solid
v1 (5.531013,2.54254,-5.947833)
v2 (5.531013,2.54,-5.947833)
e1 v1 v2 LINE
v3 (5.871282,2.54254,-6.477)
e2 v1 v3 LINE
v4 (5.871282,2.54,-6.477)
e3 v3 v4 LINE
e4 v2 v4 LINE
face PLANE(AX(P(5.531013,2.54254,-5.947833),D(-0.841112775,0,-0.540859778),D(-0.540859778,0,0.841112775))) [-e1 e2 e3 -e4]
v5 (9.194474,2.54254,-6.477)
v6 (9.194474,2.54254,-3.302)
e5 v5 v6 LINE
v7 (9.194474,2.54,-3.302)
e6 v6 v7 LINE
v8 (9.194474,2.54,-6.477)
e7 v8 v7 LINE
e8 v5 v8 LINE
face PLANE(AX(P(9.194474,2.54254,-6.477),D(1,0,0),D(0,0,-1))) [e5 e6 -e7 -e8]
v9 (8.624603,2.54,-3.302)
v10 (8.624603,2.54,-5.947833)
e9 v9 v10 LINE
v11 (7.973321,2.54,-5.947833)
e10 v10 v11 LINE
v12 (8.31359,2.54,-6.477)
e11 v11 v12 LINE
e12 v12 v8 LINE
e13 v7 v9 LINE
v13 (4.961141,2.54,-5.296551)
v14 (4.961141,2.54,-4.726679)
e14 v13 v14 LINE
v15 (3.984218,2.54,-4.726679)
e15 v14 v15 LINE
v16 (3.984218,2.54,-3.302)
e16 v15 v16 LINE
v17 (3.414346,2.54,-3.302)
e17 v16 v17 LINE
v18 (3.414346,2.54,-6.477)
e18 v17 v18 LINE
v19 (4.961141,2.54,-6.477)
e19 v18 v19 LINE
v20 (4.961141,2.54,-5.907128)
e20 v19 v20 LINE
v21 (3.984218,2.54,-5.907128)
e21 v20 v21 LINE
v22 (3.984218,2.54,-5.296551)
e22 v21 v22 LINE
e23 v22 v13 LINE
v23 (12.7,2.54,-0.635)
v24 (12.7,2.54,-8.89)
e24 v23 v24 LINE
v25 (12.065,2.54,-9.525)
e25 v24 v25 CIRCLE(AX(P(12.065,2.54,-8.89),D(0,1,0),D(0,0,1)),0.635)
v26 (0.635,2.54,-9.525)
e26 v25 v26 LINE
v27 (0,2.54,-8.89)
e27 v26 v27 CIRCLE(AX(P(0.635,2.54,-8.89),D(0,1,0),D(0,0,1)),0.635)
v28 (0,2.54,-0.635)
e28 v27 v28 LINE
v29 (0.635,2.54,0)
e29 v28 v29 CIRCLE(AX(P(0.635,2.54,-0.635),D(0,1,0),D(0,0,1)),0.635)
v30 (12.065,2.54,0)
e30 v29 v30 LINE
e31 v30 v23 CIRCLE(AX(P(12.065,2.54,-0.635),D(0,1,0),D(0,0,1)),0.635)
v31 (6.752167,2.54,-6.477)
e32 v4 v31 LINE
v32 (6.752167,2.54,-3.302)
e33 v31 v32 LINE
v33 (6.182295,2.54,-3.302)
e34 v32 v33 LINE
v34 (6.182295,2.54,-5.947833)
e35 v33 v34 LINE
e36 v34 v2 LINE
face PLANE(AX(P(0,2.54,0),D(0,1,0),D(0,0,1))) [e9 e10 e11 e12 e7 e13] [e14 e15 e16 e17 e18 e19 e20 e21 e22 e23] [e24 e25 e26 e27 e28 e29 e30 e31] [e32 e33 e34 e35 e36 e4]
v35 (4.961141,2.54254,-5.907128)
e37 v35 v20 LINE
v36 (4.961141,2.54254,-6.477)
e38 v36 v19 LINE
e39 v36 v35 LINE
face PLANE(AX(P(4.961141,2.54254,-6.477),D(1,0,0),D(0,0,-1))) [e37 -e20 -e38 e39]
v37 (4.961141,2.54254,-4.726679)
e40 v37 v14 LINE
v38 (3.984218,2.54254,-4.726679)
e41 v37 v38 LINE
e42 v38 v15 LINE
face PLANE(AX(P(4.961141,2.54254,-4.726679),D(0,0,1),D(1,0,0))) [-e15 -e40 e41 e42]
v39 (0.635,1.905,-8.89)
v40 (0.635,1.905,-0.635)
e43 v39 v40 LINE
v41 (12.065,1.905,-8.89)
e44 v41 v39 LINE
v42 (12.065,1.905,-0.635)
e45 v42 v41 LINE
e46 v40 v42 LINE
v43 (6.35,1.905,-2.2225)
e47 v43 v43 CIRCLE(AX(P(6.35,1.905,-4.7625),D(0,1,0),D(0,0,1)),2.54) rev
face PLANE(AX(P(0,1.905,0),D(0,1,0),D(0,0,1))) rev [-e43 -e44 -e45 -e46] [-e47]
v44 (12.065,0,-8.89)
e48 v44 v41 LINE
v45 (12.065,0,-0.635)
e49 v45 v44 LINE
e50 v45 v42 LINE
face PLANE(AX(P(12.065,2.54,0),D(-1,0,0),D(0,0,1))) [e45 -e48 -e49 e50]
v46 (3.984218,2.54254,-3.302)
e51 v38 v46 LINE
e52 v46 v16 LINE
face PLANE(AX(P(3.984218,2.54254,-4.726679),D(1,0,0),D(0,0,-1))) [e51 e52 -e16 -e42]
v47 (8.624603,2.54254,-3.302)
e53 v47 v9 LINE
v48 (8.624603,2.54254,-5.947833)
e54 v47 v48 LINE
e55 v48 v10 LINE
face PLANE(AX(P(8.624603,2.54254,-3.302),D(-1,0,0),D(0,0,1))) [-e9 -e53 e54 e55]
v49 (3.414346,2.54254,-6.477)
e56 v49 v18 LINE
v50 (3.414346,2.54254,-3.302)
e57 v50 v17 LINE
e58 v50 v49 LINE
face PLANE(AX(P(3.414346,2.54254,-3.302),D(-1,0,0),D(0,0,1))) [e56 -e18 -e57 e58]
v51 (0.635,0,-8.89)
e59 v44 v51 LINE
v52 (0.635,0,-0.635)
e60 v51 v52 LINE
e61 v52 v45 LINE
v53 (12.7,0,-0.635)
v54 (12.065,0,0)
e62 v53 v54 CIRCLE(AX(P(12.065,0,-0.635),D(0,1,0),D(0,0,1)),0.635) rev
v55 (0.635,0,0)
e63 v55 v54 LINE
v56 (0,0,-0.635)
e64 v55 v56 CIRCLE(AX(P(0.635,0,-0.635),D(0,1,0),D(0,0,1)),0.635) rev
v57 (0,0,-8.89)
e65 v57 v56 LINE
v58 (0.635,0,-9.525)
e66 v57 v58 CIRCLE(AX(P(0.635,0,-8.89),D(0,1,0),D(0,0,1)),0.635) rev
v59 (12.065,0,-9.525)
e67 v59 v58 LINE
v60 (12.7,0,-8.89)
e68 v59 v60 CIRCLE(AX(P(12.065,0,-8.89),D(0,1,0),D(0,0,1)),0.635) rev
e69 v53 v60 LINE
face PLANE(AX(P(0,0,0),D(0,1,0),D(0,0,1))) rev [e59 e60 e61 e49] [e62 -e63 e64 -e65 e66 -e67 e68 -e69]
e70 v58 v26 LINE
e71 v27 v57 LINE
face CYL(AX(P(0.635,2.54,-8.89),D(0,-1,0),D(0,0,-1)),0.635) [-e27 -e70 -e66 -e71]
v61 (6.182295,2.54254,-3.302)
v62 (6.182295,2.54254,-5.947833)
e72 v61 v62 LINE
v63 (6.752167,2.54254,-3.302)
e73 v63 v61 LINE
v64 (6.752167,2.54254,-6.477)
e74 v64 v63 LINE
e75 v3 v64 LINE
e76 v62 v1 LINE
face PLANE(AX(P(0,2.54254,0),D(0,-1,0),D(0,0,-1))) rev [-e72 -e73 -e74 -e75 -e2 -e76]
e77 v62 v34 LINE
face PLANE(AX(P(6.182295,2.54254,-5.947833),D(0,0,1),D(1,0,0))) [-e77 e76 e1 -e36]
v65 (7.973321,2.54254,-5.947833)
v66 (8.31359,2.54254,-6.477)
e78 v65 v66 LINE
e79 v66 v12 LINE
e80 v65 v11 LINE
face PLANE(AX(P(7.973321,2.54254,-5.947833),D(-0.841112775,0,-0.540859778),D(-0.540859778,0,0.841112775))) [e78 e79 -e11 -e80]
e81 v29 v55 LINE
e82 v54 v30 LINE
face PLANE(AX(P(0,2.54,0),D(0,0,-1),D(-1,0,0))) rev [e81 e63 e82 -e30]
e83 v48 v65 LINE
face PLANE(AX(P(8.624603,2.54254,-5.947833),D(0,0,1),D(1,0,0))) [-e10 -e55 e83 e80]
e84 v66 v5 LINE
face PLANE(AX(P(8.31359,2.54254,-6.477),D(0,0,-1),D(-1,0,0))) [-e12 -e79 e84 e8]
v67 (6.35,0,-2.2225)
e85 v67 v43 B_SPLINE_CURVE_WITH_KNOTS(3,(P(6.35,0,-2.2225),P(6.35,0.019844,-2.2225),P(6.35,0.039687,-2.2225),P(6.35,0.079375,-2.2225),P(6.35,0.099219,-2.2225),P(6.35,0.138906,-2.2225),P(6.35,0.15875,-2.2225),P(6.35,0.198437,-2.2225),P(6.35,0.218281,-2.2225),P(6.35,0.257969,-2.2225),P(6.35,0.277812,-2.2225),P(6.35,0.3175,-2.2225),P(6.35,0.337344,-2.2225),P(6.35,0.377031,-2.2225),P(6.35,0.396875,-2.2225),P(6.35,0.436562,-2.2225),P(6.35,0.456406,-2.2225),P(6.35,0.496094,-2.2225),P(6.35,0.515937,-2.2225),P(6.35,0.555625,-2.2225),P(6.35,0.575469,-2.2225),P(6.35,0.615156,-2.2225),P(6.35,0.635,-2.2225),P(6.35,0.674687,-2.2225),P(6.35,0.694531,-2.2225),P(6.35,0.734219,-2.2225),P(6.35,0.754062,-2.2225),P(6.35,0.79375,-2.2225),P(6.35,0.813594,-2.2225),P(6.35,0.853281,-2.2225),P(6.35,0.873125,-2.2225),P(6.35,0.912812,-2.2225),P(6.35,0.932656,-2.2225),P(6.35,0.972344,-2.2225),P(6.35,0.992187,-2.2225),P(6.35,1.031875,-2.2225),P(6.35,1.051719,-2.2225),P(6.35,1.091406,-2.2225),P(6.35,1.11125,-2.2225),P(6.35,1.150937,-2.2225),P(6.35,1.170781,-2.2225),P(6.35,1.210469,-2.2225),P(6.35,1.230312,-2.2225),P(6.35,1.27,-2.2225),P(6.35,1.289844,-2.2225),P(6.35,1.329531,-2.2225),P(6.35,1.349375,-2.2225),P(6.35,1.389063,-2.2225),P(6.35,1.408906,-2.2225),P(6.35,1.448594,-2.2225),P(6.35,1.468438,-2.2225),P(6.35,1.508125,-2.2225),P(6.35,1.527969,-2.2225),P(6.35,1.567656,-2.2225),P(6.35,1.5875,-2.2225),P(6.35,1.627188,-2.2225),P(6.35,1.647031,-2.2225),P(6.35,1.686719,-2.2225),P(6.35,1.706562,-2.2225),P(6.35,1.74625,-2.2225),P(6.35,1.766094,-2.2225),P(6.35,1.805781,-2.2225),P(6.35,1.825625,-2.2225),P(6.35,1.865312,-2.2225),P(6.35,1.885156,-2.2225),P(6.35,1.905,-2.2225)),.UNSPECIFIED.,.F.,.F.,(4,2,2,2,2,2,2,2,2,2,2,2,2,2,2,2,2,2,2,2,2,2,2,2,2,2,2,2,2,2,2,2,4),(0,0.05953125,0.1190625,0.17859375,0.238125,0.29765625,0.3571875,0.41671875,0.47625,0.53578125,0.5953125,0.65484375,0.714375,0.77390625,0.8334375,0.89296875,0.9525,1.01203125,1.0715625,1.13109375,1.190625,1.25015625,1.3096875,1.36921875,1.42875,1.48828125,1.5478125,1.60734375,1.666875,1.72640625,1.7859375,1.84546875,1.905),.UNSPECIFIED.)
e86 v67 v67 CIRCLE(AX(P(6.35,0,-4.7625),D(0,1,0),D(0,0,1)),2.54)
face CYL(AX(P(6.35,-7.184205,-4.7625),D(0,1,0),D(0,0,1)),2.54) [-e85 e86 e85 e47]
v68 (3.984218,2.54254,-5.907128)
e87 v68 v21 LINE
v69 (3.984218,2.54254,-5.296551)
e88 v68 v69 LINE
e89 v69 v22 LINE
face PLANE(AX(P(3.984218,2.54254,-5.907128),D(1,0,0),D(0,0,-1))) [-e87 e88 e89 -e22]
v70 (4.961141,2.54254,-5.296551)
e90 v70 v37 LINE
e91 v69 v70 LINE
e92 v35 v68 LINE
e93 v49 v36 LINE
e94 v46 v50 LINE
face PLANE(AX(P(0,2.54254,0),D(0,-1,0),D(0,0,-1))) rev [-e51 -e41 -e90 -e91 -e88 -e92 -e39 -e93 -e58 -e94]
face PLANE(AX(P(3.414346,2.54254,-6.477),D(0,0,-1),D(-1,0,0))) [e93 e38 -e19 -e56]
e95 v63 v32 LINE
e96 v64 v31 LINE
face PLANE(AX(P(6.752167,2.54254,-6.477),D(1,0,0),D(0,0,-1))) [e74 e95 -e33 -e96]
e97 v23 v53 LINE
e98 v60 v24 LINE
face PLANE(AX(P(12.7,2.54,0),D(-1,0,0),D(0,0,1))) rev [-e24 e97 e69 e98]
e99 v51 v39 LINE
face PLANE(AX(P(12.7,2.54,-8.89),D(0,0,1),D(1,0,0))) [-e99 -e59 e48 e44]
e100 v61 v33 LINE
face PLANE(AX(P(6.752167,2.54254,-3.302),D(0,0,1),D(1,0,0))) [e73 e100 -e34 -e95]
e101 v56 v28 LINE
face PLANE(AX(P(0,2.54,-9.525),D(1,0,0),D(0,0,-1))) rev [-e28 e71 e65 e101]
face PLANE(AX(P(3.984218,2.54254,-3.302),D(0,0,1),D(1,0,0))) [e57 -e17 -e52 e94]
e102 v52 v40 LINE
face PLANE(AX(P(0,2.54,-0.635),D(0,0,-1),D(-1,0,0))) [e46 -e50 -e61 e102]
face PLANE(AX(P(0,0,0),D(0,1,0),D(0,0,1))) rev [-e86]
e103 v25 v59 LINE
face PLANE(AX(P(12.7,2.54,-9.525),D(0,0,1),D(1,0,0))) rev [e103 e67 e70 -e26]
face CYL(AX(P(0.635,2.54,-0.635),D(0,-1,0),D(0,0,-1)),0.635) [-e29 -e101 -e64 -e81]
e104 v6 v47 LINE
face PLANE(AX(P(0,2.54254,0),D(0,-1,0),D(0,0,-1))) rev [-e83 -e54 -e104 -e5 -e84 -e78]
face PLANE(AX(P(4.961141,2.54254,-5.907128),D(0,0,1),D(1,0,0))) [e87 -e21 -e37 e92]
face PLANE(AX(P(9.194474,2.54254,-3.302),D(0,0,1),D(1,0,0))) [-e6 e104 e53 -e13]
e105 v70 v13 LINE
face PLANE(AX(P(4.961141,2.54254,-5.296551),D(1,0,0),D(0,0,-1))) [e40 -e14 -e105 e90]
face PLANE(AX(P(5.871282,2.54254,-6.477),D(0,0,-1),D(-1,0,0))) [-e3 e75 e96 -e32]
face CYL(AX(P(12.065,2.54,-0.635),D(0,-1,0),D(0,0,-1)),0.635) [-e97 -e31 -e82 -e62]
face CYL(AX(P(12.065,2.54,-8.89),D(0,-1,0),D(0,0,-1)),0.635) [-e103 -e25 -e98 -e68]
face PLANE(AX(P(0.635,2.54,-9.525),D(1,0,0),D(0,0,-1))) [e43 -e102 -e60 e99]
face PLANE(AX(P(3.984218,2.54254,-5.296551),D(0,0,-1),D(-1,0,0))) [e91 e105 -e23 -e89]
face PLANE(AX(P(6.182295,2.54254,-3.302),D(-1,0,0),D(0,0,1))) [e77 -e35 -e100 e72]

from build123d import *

# Parameters (mm, degrees)
SKETCH1_W           = 12.7
SKETCH1_H           = 9.525
BOSS_EXTRUDE1_DEPTH = 2.54
FILLET1_R           = 0.635
SHELL1_START        = 0.635
SHELL1_OUTLINE_W    = 1.905
SHELL1_OUTLINE_H    = 8.255
SHELL1_DEPTH        = 11.43
SKETCH2_R           = 2.54
BOSS_EXTRUDE2_DEPTH = 1.905
BOSS_EXTRUDE3_DEPTH = 0.00254


# Read off the part's stored shape, not the designer's step: Shell1
with BuildPart() as part:
    # Sketch1 → Boss-Extrude1 (new body)
    with BuildSketch(Plane(origin=(0, 0, 0), x_dir=(1, 0, 0), z_dir=(0, 1, 0))):
        with Locations((6.35, 4.7625)):
            Rectangle(SKETCH1_W, SKETCH1_H)
    extrude(amount=BOSS_EXTRUDE1_DEPTH)

    # Fillet1
    fillet1_edges = [part.edges().sort_by_distance(p)[0] for p in [
        (0, 1.27, -9.525),
        (12.7, 1.27, -9.525),
        (12.7, 1.27, 0),
        (0, 1.27, 0),
    ]]
    fillet(fillet1_edges, radius=FILLET1_R)

    # Shell1 outline → Shell1 (cut)
    with BuildSketch(Plane.YZ.offset(SHELL1_START)):
        with Locations((0.9525, -4.7625)):
            Rectangle(SHELL1_OUTLINE_W, SHELL1_OUTLINE_H)
    extrude(amount=SHELL1_DEPTH, mode=Mode.SUBTRACT)

    # Sketch2 → Boss-Extrude2 (add)
    with BuildSketch(Plane(origin=(0, 1.905, 0), x_dir=(-1, 0, 0), z_dir=(0, -1, 0))):
        with Locations(Location((-6.35, 4.7625, 0), (0, 0, 270))):
            Circle(SKETCH2_R)
    extrude(amount=BOSS_EXTRUDE2_DEPTH)

    # Sketch3 → Boss-Extrude3 (add)
    with BuildSketch(Plane(origin=(0, 2.54, 0), x_dir=(1, 0, 0), z_dir=(0, 1, 0))):
        Polygon((3.414346154, 6.477), (4.961141026, 6.477), (4.961141026, 5.907128205), (3.984217949, 5.907128205), (3.984217949, 5.296551282), (4.961141026, 5.296551282), (4.961141026, 4.726679487), (3.984217949, 4.726679487), (3.984217949, 3.302), (3.414346154, 3.302), align=None)
        Polygon((5.871282252, 6.477), (6.752166667, 6.477), (6.752166667, 3.302), (6.182294872, 3.302), (6.182294872, 5.947833333), (5.531012821, 5.947833333), align=None)
        Polygon((8.313589944, 6.477), (9.194474359, 6.477), (9.194474359, 3.302), (8.624602564, 3.302), (8.624602564, 5.947833333), (7.973320513, 5.947833333), align=None)
    extrude(amount=BOSS_EXTRUDE3_DEPTH)


solid = part.part
